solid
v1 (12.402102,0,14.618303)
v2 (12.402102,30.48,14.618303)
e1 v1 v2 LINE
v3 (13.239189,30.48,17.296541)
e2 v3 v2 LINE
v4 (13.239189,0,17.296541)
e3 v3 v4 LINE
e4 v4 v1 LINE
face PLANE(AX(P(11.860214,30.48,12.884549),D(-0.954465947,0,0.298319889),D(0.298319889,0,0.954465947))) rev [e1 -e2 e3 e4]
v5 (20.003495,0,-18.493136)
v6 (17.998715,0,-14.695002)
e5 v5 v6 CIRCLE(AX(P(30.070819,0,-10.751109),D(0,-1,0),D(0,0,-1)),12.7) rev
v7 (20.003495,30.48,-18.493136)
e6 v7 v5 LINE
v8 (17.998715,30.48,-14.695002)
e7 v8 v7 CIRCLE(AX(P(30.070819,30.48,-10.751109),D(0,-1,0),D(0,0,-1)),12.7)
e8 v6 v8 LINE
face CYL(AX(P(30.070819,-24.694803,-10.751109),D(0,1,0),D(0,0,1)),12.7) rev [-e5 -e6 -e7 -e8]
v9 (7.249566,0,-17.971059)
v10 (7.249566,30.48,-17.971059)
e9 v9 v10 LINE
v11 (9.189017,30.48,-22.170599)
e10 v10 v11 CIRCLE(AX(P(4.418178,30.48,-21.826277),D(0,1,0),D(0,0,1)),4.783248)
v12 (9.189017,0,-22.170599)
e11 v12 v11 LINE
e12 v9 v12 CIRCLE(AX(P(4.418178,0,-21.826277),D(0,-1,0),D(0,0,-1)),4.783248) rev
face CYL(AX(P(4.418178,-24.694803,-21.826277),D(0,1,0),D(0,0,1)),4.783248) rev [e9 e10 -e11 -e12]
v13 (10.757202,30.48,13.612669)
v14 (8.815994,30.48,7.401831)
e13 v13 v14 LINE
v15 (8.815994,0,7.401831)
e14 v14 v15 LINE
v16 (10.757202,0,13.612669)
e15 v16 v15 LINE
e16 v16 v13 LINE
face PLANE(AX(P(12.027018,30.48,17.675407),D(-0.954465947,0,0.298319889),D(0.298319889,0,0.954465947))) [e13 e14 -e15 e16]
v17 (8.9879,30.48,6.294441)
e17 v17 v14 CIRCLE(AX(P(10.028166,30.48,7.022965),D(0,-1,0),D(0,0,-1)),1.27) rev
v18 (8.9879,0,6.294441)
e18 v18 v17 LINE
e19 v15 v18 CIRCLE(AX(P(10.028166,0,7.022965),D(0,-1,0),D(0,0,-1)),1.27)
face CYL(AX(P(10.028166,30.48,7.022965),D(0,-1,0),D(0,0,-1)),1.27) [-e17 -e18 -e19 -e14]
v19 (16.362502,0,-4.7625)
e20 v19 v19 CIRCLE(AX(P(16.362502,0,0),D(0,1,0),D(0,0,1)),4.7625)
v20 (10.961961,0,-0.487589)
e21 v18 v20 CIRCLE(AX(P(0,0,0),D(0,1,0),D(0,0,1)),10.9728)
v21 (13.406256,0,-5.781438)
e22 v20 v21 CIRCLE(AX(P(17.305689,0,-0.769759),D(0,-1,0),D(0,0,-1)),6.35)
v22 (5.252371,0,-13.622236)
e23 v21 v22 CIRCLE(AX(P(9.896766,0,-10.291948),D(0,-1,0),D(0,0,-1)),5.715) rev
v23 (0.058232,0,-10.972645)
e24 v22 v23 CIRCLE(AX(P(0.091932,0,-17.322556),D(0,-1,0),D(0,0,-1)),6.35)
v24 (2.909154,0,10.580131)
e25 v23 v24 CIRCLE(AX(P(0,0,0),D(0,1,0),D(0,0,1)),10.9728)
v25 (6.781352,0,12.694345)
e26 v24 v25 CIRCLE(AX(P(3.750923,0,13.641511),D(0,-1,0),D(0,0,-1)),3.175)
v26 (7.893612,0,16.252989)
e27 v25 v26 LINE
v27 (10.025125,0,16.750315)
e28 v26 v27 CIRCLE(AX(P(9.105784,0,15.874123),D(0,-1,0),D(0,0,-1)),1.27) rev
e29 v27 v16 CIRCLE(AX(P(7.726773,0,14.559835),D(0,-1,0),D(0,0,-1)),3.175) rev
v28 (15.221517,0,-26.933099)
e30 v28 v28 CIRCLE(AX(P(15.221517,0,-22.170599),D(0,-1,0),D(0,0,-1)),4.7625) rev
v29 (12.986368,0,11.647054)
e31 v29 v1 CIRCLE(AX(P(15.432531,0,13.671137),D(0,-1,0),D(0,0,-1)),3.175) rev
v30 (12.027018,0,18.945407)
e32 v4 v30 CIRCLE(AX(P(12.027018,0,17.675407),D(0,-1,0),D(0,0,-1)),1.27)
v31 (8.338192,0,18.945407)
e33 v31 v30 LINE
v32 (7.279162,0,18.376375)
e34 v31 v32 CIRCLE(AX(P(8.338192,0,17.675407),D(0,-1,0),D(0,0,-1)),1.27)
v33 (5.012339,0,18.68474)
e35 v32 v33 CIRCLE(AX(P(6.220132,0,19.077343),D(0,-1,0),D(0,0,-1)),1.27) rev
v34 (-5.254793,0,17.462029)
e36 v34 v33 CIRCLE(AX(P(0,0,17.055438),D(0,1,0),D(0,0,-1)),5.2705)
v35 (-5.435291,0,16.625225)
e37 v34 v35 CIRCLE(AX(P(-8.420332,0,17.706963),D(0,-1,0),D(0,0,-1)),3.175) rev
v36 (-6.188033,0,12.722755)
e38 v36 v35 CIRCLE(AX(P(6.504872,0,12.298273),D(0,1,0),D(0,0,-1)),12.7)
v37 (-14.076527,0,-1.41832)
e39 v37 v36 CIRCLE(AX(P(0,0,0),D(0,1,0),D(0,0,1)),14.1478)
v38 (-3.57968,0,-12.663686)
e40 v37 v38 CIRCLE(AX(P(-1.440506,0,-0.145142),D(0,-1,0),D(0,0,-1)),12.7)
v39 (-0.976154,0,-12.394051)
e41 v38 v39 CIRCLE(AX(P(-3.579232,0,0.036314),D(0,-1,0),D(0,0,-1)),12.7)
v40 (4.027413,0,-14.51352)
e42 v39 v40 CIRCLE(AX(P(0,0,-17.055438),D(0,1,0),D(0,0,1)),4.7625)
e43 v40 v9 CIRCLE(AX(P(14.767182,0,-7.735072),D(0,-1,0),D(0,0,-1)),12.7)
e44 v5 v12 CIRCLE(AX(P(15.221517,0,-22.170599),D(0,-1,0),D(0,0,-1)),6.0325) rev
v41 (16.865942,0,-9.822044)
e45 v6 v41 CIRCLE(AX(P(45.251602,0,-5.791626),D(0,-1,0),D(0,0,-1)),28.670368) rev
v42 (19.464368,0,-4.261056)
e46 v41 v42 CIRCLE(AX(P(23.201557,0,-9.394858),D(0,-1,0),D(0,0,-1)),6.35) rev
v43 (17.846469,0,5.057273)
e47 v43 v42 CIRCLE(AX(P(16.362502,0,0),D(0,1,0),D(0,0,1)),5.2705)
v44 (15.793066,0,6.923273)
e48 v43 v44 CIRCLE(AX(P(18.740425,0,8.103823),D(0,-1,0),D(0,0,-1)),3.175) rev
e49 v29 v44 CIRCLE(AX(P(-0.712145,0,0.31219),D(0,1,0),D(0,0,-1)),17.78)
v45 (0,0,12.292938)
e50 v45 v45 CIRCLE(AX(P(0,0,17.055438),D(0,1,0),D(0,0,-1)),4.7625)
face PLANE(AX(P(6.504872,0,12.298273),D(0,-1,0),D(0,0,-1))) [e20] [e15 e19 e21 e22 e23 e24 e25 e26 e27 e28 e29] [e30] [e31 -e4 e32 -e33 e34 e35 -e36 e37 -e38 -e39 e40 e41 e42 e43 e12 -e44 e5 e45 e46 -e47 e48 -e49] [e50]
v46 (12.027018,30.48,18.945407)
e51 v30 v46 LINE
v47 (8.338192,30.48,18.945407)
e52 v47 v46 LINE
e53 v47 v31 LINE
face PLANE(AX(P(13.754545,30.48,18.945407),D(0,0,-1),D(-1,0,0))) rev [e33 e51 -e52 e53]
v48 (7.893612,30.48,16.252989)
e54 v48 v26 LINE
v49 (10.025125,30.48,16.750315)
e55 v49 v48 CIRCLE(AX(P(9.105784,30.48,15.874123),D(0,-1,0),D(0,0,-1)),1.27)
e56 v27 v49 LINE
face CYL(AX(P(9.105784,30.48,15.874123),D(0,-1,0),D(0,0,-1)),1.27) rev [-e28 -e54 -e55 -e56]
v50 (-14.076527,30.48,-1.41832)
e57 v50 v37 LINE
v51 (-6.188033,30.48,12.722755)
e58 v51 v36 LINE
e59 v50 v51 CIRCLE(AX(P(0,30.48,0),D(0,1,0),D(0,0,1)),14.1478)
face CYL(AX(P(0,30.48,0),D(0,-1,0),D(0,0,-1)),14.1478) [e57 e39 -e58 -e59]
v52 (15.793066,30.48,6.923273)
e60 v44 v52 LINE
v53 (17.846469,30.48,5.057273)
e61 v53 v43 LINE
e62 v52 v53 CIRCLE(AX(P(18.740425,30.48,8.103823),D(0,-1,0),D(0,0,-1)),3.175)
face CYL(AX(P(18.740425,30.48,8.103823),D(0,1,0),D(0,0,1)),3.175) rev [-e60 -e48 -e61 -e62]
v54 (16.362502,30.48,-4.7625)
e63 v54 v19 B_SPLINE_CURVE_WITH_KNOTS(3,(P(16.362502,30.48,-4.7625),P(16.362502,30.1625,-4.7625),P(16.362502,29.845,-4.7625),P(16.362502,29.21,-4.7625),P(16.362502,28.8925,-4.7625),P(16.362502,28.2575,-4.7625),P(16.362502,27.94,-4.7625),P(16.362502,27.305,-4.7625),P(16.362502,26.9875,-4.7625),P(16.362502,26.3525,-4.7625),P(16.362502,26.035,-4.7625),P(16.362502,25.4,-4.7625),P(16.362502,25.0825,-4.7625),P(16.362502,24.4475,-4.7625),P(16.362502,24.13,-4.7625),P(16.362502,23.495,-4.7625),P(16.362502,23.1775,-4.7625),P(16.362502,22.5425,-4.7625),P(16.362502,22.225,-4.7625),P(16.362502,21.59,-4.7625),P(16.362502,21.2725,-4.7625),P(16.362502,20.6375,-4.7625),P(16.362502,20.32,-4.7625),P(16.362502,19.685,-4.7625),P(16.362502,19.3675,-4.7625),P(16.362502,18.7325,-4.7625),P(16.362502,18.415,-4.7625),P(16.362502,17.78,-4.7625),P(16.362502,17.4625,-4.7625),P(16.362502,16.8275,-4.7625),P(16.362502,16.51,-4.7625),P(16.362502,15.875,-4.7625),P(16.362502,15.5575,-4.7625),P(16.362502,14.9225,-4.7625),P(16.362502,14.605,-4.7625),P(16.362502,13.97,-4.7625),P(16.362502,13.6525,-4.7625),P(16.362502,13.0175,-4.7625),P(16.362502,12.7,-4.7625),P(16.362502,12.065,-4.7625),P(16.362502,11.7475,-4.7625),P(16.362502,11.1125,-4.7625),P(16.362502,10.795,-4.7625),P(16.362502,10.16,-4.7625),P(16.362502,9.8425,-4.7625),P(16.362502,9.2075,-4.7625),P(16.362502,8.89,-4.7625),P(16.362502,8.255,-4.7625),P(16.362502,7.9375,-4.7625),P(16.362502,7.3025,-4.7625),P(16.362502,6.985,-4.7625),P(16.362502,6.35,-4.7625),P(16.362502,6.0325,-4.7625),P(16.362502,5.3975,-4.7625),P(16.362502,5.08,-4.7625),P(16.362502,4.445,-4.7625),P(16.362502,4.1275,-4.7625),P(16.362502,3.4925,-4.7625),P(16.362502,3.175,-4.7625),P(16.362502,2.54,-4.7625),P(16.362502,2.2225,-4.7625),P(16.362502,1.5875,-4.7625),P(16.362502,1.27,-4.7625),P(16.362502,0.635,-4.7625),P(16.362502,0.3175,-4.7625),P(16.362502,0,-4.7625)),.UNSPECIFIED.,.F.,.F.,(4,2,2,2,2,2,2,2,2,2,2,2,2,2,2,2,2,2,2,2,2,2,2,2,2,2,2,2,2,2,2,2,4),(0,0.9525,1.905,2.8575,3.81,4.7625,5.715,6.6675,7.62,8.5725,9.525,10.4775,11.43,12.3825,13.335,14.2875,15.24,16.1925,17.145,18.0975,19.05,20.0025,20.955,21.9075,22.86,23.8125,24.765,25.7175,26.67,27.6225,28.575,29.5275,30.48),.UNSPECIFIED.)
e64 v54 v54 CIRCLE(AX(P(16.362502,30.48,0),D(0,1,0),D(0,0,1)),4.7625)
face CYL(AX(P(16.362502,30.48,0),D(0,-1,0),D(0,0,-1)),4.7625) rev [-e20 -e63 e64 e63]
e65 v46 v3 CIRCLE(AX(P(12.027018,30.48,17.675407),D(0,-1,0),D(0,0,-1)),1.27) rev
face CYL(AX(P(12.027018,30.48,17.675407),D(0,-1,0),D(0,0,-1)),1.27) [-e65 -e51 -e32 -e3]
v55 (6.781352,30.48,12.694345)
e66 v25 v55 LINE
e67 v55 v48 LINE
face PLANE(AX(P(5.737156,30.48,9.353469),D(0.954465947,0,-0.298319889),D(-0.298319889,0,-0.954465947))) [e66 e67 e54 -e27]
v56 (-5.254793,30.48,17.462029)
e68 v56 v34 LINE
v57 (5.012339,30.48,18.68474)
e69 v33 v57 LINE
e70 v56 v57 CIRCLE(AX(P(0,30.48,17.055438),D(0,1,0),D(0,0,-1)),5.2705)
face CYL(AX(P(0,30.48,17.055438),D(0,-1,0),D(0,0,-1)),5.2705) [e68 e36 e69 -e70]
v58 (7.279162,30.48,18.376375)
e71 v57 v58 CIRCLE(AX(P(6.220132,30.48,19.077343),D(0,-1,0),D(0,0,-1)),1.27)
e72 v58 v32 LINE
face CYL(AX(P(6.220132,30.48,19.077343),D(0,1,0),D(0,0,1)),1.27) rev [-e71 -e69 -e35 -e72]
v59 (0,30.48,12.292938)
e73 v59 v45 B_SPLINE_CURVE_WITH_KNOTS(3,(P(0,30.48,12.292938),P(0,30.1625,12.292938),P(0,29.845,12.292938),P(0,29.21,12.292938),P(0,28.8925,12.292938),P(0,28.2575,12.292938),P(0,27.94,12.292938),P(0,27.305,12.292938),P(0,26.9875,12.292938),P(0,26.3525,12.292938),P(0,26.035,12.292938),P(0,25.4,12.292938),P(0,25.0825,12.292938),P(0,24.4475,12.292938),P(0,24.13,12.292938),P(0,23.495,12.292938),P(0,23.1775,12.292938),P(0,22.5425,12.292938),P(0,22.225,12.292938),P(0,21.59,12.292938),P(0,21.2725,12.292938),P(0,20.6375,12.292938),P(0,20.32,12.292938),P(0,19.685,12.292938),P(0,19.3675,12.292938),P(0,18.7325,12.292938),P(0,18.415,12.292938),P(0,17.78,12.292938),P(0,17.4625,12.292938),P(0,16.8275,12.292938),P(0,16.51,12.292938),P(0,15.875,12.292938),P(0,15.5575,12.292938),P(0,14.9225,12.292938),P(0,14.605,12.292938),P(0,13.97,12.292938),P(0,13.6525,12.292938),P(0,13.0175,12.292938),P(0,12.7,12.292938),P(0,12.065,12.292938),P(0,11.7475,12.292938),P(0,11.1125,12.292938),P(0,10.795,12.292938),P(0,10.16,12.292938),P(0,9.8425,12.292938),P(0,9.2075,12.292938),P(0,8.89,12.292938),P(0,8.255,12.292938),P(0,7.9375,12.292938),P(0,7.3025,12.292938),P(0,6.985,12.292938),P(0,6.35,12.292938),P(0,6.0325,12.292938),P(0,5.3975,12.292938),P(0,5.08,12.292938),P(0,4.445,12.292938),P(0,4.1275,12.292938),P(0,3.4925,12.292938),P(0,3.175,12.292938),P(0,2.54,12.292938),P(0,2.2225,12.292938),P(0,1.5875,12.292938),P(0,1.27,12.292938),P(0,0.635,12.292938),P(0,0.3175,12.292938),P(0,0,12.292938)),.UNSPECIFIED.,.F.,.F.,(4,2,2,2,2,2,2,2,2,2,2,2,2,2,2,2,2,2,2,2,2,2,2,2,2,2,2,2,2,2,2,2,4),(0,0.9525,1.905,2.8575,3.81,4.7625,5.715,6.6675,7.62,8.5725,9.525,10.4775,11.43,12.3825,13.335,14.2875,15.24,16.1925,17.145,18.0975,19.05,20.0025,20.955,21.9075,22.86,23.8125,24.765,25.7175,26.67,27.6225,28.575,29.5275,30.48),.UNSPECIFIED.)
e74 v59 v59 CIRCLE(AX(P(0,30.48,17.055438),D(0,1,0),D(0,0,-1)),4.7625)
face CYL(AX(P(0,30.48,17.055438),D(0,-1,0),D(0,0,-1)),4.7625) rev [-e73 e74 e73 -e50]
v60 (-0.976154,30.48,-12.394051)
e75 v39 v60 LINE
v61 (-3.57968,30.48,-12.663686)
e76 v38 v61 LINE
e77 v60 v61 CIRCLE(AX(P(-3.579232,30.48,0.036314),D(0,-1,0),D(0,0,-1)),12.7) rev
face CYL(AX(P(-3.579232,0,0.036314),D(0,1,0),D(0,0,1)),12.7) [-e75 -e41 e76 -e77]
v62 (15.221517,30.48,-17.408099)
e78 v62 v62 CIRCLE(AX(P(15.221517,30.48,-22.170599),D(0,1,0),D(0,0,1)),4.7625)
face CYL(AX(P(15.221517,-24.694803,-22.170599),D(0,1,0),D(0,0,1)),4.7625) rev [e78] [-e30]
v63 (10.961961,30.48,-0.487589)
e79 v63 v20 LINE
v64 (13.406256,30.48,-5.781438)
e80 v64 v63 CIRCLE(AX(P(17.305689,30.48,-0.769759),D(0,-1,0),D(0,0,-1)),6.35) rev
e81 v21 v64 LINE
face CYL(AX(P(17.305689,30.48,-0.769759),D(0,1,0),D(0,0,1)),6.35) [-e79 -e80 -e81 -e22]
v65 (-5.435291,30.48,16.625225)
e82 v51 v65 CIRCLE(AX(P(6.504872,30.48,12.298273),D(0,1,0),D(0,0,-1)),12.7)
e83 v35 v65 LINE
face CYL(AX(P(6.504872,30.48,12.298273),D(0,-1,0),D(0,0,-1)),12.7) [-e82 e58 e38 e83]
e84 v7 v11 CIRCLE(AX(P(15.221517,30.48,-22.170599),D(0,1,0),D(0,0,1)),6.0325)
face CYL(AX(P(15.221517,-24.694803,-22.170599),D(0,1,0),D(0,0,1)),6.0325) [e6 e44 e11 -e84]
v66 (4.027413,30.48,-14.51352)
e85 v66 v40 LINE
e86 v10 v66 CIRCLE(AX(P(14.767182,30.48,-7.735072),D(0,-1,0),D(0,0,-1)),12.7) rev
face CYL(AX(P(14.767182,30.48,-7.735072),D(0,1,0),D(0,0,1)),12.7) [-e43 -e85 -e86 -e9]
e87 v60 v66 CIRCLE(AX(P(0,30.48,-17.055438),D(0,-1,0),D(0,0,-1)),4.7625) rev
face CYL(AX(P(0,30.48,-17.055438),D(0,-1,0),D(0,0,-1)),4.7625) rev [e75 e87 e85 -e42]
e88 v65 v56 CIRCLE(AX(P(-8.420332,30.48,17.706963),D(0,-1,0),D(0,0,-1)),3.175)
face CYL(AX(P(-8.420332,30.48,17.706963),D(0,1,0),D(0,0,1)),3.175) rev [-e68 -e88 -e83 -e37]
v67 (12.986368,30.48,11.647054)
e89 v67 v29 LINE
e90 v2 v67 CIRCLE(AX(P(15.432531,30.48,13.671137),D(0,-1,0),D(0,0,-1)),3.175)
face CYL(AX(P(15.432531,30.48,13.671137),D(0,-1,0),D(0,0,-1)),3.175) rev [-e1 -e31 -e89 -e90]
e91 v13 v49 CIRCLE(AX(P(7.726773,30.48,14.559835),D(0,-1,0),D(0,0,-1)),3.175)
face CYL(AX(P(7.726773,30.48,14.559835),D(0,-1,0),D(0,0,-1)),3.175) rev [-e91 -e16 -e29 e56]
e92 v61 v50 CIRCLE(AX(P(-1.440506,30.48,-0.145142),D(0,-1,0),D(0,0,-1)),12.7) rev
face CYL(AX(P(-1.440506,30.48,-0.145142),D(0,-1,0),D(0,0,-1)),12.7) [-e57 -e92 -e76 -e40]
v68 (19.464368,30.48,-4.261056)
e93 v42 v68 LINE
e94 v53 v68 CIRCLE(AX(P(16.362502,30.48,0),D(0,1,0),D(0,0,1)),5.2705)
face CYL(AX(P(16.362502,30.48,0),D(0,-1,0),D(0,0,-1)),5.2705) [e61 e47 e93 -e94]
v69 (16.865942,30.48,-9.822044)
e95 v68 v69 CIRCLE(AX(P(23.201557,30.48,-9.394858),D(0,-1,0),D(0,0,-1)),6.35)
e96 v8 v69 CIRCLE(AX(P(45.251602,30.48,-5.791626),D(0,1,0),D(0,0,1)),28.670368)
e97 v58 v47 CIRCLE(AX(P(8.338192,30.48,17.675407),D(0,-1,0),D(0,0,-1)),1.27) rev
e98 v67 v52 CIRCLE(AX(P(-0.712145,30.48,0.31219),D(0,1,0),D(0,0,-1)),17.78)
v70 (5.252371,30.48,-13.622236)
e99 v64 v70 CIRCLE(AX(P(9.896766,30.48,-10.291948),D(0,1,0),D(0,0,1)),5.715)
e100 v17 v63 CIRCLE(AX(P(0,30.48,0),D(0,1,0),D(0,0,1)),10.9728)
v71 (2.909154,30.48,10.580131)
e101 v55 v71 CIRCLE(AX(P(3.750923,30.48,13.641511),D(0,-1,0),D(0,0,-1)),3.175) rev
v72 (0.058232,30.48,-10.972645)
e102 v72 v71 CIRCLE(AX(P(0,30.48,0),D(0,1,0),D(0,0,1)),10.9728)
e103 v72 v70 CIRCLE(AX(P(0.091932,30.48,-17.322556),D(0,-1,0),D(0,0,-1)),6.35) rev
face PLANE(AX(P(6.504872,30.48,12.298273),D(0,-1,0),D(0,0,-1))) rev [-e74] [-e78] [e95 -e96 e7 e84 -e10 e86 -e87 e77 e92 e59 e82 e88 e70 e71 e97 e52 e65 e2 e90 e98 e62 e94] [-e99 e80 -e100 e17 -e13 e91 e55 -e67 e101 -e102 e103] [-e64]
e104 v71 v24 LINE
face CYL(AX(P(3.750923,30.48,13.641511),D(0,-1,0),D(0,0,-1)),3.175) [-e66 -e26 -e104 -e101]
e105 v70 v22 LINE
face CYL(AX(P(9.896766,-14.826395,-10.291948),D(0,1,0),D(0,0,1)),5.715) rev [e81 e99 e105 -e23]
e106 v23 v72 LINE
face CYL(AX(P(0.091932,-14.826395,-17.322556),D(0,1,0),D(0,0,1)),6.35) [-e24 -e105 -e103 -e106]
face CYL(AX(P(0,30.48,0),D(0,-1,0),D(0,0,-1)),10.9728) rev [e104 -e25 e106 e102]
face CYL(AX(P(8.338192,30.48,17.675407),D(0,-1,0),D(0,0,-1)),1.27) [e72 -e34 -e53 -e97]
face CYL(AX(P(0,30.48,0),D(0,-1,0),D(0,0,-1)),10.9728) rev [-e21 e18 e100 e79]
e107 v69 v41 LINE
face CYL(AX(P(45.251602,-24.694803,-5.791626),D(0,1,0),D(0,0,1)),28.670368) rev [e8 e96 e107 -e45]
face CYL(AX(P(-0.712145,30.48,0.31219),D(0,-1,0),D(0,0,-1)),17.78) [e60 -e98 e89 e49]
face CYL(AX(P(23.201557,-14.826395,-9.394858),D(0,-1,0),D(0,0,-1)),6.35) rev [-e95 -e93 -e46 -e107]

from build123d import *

# Parameters (mm, degrees)
SKETCH1_R               = 4.7625
BOSS_EXTRUDE2_DEPTH     = 30.48
FILLET1_R               = 3.175
FILLET3_R               = 1.27
FILLET4_R               = 3.175
FILLET5_R               = 1.27
FILLET6_R               = 1.27
BOSS_EXTRUDE9_START     = -30.48
BOSS_EXTRUDE9_DEPTH     = 30.48
CUT_EXTRUDE6_START      = -30.48
CUT_EXTRUDE6_DEPTH      = 30.48
FILLET9_R               = 6.35
CUT_EXTRUDE7_DEPTH      = 44.536935081
CUT_EXTRUDE7_DEPTH_BACK = 44.536935081
BOSS_EXTRUDE11_START    = -30.48
SKETCH4_R               = 4.7625
BOSS_EXTRUDE11_DEPTH    = 30.48
FILLET10_R              = 12.7
FILLET11_R              = 12.7


with BuildPart() as part:
    # Sketch1 → Boss-Extrude2 (new body)
    with BuildSketch(Plane(origin=(0, 0, 0), x_dir=(1, 0, 0), z_dir=(0, 1, 0))):
        with BuildLine():
            Line((11.860213807, -12.884548704), (13.754545104, -18.945407466))
            Line((13.754545104, -18.945407466), (7.404545104, -18.945407466))
            Line((7.404545104, -18.945407466), (6.640447212, -16.500698134))
            ThreePointArc((6.640447212, -16.500698134), (5.961240353, -16.792309403), (5.2705, -17.055438375))
            ThreePointArc((5.2705, -17.055438375), (0, -22.325938375), (-5.2705, -17.055438375))
            ThreePointArc((-5.2705, -17.055438375), (-5.919586773, -14.929400926), (-6.188032569, -12.722755117))
            ThreePointArc((-6.188032569, -12.722755117), (-14.1478, 0), (-6.188032569, 12.722755117))
            ThreePointArc((-6.188032569, 12.722755117), (-5.919586773, 14.929400926), (-5.2705, 17.055438375))
            ThreePointArc((-5.2705, 17.055438375), (0, 22.325938375), (5.2705, 17.055438375))
            ThreePointArc((5.2705, 17.055438375), (12.040379738, 12.314885712), (16.362502035, 5.2705))
            ThreePointArc((16.362502035, 5.2705), (21.633002035, 0), (16.362502035, -5.2705))
            ThreePointArc((16.362502035, -5.2705), (14.592418813, -9.361982053), (11.860213807, -12.884548704))
        make_face()
        with Locations(Location((0, 17.055438375, 0), (0, 0, 90))):
            Circle(SKETCH1_R, mode=Mode.SUBTRACT)
        with Locations(Location((16.362502035, 0, 0), (0, 0, 90))):
            Circle(SKETCH1_R, mode=Mode.SUBTRACT)
        with Locations(Location((0, -17.055438375, 0), (0, 0, 90))):
            Circle(SKETCH1_R, mode=Mode.SUBTRACT)
        with BuildLine():
            Line((5.737156066, -9.353468881), (8.338191551, -17.675407466))
            Line((8.338191551, -17.675407466), (12.027017511, -17.675407466))
            Line((12.027017511, -17.675407466), (8.623309815, -6.785342119))
            ThreePointArc((8.623309815, -6.785342119), (-7.294145861, 8.197424961), (5.737156066, -9.353468881))
        make_face(mode=Mode.SUBTRACT)
    extrude(amount=BOSS_EXTRUDE2_DEPTH)

    # Fillet1
    # the kernel refuses this fillet: 3.175 mm, written as the material it adds along each edge
    with BuildSketch(Plane(origin=(-6.188032569, 0, -12.722755117), x_dir=(-0.8747186698844794, 0, 0.4846310437389738), z_dir=(0, 1, 0))) as fillet1_piece_1:
        with BuildLine():
            CenterArc((1.675106808, -3.170499128), FILLET1_R, 93.05116293, 49.316383357)
            ThreePointArc((-0.839315123, -1.231863693), (-0.401568779, -0.628256415), (0, 0))
            ThreePointArc((0, 0), (0.753054473, -0.020055884), (1.506108946, 0))
        make_face()
    extrude(amount=30.48)
    with BuildSketch(Plane(origin=(-5.2705, 0, -17.055438375), x_dir=(-0.35770128840140486, 0, 0.9338360607065755), z_dir=(0, 1, 0))) as fillet1_piece_2:
        with BuildLine():
            CenterArc((0.51828136, -3.174477714), FILLET1_R, 91.039263795, 15.495369937)
            ThreePointArc((-0.385307362, -0.130770695), (-0.191391238, -0.069105054), (0, 0))
            ThreePointArc((0, 0), (0.230347271, -0.002089143), (0.460694542, 0))
        make_face()
    extrude(amount=30.48)
    with BuildSketch(Plane(origin=(5.2705, 0, -17.055438375), x_dir=(-0.12720688847868244, 0, -0.9918762057452392), z_dir=(0, 1, 0))) as fillet1_piece_3:
        with BuildLine():
            CenterArc((1.744769682, -3.149206953), FILLET1_R, 97.308218729, 47.663807195)
            ThreePointArc((-0.855148612, -1.326832167), (-0.414685297, -0.671723102), (0, 0))
            ThreePointArc((0, 0), (0.670443906, -0.042816458), (1.340887811, 0))
        make_face()
    extrude(amount=30.48)
    with BuildSketch(Plane(origin=(16.362502035, 0, -5.2705), x_dir=(-0.3771647323765371, 0, -0.9261461896759794), z_dir=(0, 1, 0))) as fillet1_piece_4:
        with BuildLine():
            CenterArc((1.804499427, -3.172306197), FILLET1_R, 92.360366346, 49.97819677)
            ThreePointArc((-0.70894152, -1.232399084), (-0.312723775, -0.640214629), (0, 0))
            ThreePointArc((0, 0), (0.8368693, -0.017240341), (1.673738599, 0))
        make_face()
    extrude(amount=30.48)
    with BuildSketch(Plane(origin=(16.362502035, 0, 5.2705), x_dir=(0.9898341628287173, 0, -0.14222633404954374), z_dir=(0, 1, 0))) as fillet1_piece_5:
        with BuildLine():
            CenterArc((1.950776398, -3.142723467), FILLET1_R, 98.176695151, 51.81827723)
            ThreePointArc((-0.798714948, -1.554982197), (-0.380235314, -0.787313176), (0, 0))
            ThreePointArc((0, 0), (0.749603894, -0.053579045), (1.499207787, 0))
        make_face()
    extrude(amount=30.48)
    with BuildSketch(Plane(origin=(11.860213807, 0, 12.884548704), x_dir=(0.29831988928740816, 0, 0.9544659468286695), z_dir=(0, 1, 0))) as fillet1_piece_6:
        with BuildLine():
            CenterArc((1.816465361, 3.175), FILLET1_R, 213.037149694, 56.962850306)
            ThreePointArc((-0.845191928, 1.444044923), (-0.405599886, 0.731970177), (0, 0))
            Line((0, 0), (1.816465361, 0))
        make_face()
    extrude(amount=30.48)
    with BuildSketch(Plane(origin=(5.2705, 0, 17.055438375), x_dir=(0.9268908474954334, 0, -0.37533099636080863), z_dir=(0, 1, 0))) as fillet1_piece_7:
        with BuildLine():
            CenterArc((1.820147869, -3.156511003), FILLET1_R, 96.186334825, 46.370096176)
            ThreePointArc((-0.700651409, -1.226175281), (-0.30907029, -0.636661485), (0, 0))
            ThreePointArc((0, 0), (0.73900137, -0.015364429), (1.47800274, 0))
        make_face()
    extrude(amount=30.48)
    with BuildSketch(Plane(origin=(-5.2705, 0, 17.055438375), x_dir=(0.038601082712793416, 0, 0.999254700471006), z_dir=(0, 1, 0))) as fillet1_piece_8:
        with BuildLine():
            CenterArc((0.52945245, -3.172633674), FILLET1_R, 92.212228742, 15.495369937)
            ThreePointArc((-0.436253651, -0.148061518), (-0.217455401, -0.076009068), (0, 0))
            ThreePointArc((0, 0), (0.203447006, -0.003928101), (0.406894013, 0))
        make_face()
    extrude(amount=30.48)
    # the kernel refuses this fillet: 3.175 mm, written as the material it takes off along each edge
    with BuildSketch(Plane(origin=(5.737156066, -8.75064331, 9.353468881), x_dir=(0.29831988928740744, 0, 0.9544659468286697), z_dir=(0, 1, 0))) as fillet1_2_piece_1:
        with BuildLine():
            CenterArc((3.500257324, -3.175), FILLET1_R, 90, 88.017608619)
            ThreePointArc((0.327157544, -3.065169276), (0.271751922, -1.521038893), (0, 0))
            Line((0, 0), (3.500257324, 0))
        make_face()
    extrude(amount=47.98128662, mode=Mode.SUBTRACT)

    # Fillet3
    fillet3_edges = [part.edges().sort_by_distance(p)[0] for p in [
        (13.754545104, 15.24, 18.945407466),
        (7.404545104, 15.24, 18.945407466),
    ]]
    fillet(fillet3_edges, radius=FILLET3_R)

    # Fillet4
    # the kernel refuses this fillet: 3.175 mm, written as the material it adds along each edge
    with BuildSketch(Plane(origin=(12.027017511, 0, 17.675407466), x_dir=(-0.29831988928740777, 0, -0.9544659468286695), z_dir=(0, 1, 0))) as fillet4_piece_1:
        with BuildLine():
            CenterArc((4.256556411, 3.175), FILLET4_R, 173.746252409, 96.253747591)
            Line((1.100450152, 3.520858762), (1.037328027, 3.527775938))
            ThreePointArc((1.037328027, 3.527775938), (0.489616488, 1.779372694), (-0.060608588, 0.018943313))
            Line((-0.060608588, 0.018943313), (0, -0.0635))
            Line((0, -0.0635), (4.256556411, -0.0635))
            Line((4.256556411, -0.0635), (4.256556411, 0))
        make_face()
    extrude(amount=30.48)

    # Fillet5
    fillet5_edges = [part.edges().sort_by_distance(p)[0] for p in [
        (8.338191551, 15.24, 17.675407466),
    ]]
    fillet(fillet5_edges, radius=FILLET5_R)

    # Fillet6
    fillet6_edges = [part.edges().sort_by_distance(p)[0] for p in [
        (6.640447212, 15.24, 16.500698134),
        (8.623309815, 15.24, 6.785342119),
    ]]
    fillet(fillet6_edges, radius=FILLET6_R)

    # Sketch2 → Boss-Extrude9 (add)
    with BuildSketch(Plane(origin=(0, 30.48, 0), x_dir=(1, 0, 0), z_dir=(0, 1, 0)).offset(BOSS_EXTRUDE9_START)):
        with BuildLine():
            ThreePointArc((7.943426233, 15.662766674), (13.175324303, 14.973004025), (15.611766116, 10.291948459))
            ThreePointArc((15.611766116, 10.291948459), (15.492196473, 9.129027942), (15.138490831, 8.014768839))
            ThreePointArc((15.138490831, 8.014768839), (15.444654673, 7.422560084), (15.731226864, 6.820626626))
            ThreePointArc((15.731226864, 6.820626626), (15.781158654, 6.716236617), (15.834861283, 6.61373547))
            ThreePointArc((15.834861283, 6.61373547), (16.614943687, 8.379799111), (16.881766116, 10.291948459))
            ThreePointArc((16.881766116, 10.291948459), (13.476256049, 16.290071233), (6.580412696, 16.439470316))
            ThreePointArc((6.580412696, 16.439470316), (6.637545403, 16.407150651), (6.69533405, 16.376019005))
            ThreePointArc((6.69533405, 16.376019005), (7.325689413, 16.030433186), (7.943426233, 15.662766674))
        make_face()
    extrude(amount=BOSS_EXTRUDE9_DEPTH)

    # Sketch2<12> → Cut-Extrude6 (cut)
    with BuildSketch(Plane(origin=(0, 30.48, 0), x_dir=(1, 0, 0), z_dir=(0, 1, 0)).offset(CUT_EXTRUDE6_START)):
        with BuildLine():
            ThreePointArc((15.138490831, 8.014768839), (12.043511127, 12.311557951), (7.943426233, 15.662766674))
            ThreePointArc((7.943426233, 15.662766674), (5.173639716, 13.509603196), (4.183683511, 10.143920944))
            ThreePointArc((4.183683511, 10.143920944), (7.605607592, 7.90930294), (9.972426866, 4.577449316))
            ThreePointArc((9.972426866, 4.577449316), (13.062589614, 5.533925069), (15.138490831, 8.014768839))
        make_face()
    extrude(amount=CUT_EXTRUDE6_DEPTH, mode=Mode.SUBTRACT)

    # Fillet9
    fillet9_edges = [part.edges().sort_by_distance(p)[0] for p in [
        (6.580412696, 15.24, -16.439470316),
        (15.834861283, 15.24, -6.61373547),
        (9.972426866, 15.24, -4.577449316),
        (4.183683511, 15.24, -10.143920944),
    ]]
    fillet(fillet9_edges, radius=FILLET9_R)

    # Sketch3 → Cut-Extrude7 (cut, two sides: drawn at the far end of the back side and taken through both)
    with BuildSketch(Plane(origin=(0, 30.48, 0), x_dir=(1, 0, 0), z_dir=(0, 1, 0)).offset(-CUT_EXTRUDE7_DEPTH_BACK)):
        with BuildLine():
            Line((-7.505454184, 11.992847966), (-2.296148987, 12.883016287))
            ThreePointArc((-2.296148987, 12.883016287), (2.423426985, 12.955632538), (4.7625, 17.055438375))
            Line((4.7625, 17.055438375), (9.734184624, 17.275056095))
            ThreePointArc((9.734184624, 17.275056095), (-1.208436668, 22.214922829), (-7.505454184, 11.992847966))
        make_face()
    extrude(amount=CUT_EXTRUDE7_DEPTH + CUT_EXTRUDE7_DEPTH_BACK, mode=Mode.SUBTRACT)

    # Sketch4 → Boss-Extrude11 (add)
    with BuildSketch(Plane(origin=(0, 30.48, 0), x_dir=(1, 0, 0), z_dir=(0, 1, 0)).offset(BOSS_EXTRUDE11_START)):
        with BuildLine():
            ThreePointArc((16.86594215, 9.822043775), (17.712963238, 13.767422556), (19.105519309, 17.554802394))
            ThreePointArc((19.105519309, 17.554802394), (17.767180424, 27.639662161), (9.18901652, 22.17059903))
            ThreePointArc((9.18901652, 22.17059903), (9.198998035, 21.978650402), (9.201259866, 21.786455734))
            ThreePointArc((9.201259866, 21.786455734), (7.906472539, 18.553470941), (4.7625, 17.055438375))
            Line((4.7625, 17.055438375), (9.734184624, 17.275056095))
            ThreePointArc((9.734184624, 17.275056095), (14.943475982, 15.121124841), (16.86594215, 9.822043775))
        make_face()
        with Locations(Location((15.22151652, 22.17059903, 0), (0, 0, 270))):
            Circle(SKETCH4_R, mode=Mode.SUBTRACT)
    extrude(amount=BOSS_EXTRUDE11_DEPTH)

    # Fillet10
    fillet10_edges = [part.edges().sort_by_distance(p)[0] for p in [
        (4.7625, 15.24, -17.055438375),
        (19.105519309, 15.24, -17.554802394),
        (-7.505454184, 15.24, -11.992847966),
    ]]
    fillet(fillet10_edges, radius=FILLET10_R)

    # Fillet11
    # the kernel refuses this fillet: 12.7 mm, written as the material it takes off along each edge
    with BuildSketch(Plane(origin=(-2.296148987, -3.519120011, -12.883016287), x_dir=(0.9377307104980771, 0, 0.3473630875449655), z_dir=(0, 1, 0))) as fillet11_piece_1:
        with BuildLine():
            CenterArc((3.28451201, -12.560548615), FILLET11_R, 98.498560753, 11.829576247)
            Line((-1.127419619, -0.651524335), (-1.215658252, -0.413343849))
            ThreePointArc((-1.215658252, -0.413343849), (-0.690798794, -0.105843114), (-0.127088985, 0.219919053))
            Line((-0.127088985, 0.219919053), (0.03753728, 0.251210972))
            ThreePointArc((0.03753728, 0.251210972), (0.703824002, 0.201705731), (1.370110724, 0.251210972))
            Line((1.370110724, 0.251210972), (1.407648004, 0))
        make_face()
    extrude(amount=37.518240022, mode=Mode.SUBTRACT)


solid = part.part
